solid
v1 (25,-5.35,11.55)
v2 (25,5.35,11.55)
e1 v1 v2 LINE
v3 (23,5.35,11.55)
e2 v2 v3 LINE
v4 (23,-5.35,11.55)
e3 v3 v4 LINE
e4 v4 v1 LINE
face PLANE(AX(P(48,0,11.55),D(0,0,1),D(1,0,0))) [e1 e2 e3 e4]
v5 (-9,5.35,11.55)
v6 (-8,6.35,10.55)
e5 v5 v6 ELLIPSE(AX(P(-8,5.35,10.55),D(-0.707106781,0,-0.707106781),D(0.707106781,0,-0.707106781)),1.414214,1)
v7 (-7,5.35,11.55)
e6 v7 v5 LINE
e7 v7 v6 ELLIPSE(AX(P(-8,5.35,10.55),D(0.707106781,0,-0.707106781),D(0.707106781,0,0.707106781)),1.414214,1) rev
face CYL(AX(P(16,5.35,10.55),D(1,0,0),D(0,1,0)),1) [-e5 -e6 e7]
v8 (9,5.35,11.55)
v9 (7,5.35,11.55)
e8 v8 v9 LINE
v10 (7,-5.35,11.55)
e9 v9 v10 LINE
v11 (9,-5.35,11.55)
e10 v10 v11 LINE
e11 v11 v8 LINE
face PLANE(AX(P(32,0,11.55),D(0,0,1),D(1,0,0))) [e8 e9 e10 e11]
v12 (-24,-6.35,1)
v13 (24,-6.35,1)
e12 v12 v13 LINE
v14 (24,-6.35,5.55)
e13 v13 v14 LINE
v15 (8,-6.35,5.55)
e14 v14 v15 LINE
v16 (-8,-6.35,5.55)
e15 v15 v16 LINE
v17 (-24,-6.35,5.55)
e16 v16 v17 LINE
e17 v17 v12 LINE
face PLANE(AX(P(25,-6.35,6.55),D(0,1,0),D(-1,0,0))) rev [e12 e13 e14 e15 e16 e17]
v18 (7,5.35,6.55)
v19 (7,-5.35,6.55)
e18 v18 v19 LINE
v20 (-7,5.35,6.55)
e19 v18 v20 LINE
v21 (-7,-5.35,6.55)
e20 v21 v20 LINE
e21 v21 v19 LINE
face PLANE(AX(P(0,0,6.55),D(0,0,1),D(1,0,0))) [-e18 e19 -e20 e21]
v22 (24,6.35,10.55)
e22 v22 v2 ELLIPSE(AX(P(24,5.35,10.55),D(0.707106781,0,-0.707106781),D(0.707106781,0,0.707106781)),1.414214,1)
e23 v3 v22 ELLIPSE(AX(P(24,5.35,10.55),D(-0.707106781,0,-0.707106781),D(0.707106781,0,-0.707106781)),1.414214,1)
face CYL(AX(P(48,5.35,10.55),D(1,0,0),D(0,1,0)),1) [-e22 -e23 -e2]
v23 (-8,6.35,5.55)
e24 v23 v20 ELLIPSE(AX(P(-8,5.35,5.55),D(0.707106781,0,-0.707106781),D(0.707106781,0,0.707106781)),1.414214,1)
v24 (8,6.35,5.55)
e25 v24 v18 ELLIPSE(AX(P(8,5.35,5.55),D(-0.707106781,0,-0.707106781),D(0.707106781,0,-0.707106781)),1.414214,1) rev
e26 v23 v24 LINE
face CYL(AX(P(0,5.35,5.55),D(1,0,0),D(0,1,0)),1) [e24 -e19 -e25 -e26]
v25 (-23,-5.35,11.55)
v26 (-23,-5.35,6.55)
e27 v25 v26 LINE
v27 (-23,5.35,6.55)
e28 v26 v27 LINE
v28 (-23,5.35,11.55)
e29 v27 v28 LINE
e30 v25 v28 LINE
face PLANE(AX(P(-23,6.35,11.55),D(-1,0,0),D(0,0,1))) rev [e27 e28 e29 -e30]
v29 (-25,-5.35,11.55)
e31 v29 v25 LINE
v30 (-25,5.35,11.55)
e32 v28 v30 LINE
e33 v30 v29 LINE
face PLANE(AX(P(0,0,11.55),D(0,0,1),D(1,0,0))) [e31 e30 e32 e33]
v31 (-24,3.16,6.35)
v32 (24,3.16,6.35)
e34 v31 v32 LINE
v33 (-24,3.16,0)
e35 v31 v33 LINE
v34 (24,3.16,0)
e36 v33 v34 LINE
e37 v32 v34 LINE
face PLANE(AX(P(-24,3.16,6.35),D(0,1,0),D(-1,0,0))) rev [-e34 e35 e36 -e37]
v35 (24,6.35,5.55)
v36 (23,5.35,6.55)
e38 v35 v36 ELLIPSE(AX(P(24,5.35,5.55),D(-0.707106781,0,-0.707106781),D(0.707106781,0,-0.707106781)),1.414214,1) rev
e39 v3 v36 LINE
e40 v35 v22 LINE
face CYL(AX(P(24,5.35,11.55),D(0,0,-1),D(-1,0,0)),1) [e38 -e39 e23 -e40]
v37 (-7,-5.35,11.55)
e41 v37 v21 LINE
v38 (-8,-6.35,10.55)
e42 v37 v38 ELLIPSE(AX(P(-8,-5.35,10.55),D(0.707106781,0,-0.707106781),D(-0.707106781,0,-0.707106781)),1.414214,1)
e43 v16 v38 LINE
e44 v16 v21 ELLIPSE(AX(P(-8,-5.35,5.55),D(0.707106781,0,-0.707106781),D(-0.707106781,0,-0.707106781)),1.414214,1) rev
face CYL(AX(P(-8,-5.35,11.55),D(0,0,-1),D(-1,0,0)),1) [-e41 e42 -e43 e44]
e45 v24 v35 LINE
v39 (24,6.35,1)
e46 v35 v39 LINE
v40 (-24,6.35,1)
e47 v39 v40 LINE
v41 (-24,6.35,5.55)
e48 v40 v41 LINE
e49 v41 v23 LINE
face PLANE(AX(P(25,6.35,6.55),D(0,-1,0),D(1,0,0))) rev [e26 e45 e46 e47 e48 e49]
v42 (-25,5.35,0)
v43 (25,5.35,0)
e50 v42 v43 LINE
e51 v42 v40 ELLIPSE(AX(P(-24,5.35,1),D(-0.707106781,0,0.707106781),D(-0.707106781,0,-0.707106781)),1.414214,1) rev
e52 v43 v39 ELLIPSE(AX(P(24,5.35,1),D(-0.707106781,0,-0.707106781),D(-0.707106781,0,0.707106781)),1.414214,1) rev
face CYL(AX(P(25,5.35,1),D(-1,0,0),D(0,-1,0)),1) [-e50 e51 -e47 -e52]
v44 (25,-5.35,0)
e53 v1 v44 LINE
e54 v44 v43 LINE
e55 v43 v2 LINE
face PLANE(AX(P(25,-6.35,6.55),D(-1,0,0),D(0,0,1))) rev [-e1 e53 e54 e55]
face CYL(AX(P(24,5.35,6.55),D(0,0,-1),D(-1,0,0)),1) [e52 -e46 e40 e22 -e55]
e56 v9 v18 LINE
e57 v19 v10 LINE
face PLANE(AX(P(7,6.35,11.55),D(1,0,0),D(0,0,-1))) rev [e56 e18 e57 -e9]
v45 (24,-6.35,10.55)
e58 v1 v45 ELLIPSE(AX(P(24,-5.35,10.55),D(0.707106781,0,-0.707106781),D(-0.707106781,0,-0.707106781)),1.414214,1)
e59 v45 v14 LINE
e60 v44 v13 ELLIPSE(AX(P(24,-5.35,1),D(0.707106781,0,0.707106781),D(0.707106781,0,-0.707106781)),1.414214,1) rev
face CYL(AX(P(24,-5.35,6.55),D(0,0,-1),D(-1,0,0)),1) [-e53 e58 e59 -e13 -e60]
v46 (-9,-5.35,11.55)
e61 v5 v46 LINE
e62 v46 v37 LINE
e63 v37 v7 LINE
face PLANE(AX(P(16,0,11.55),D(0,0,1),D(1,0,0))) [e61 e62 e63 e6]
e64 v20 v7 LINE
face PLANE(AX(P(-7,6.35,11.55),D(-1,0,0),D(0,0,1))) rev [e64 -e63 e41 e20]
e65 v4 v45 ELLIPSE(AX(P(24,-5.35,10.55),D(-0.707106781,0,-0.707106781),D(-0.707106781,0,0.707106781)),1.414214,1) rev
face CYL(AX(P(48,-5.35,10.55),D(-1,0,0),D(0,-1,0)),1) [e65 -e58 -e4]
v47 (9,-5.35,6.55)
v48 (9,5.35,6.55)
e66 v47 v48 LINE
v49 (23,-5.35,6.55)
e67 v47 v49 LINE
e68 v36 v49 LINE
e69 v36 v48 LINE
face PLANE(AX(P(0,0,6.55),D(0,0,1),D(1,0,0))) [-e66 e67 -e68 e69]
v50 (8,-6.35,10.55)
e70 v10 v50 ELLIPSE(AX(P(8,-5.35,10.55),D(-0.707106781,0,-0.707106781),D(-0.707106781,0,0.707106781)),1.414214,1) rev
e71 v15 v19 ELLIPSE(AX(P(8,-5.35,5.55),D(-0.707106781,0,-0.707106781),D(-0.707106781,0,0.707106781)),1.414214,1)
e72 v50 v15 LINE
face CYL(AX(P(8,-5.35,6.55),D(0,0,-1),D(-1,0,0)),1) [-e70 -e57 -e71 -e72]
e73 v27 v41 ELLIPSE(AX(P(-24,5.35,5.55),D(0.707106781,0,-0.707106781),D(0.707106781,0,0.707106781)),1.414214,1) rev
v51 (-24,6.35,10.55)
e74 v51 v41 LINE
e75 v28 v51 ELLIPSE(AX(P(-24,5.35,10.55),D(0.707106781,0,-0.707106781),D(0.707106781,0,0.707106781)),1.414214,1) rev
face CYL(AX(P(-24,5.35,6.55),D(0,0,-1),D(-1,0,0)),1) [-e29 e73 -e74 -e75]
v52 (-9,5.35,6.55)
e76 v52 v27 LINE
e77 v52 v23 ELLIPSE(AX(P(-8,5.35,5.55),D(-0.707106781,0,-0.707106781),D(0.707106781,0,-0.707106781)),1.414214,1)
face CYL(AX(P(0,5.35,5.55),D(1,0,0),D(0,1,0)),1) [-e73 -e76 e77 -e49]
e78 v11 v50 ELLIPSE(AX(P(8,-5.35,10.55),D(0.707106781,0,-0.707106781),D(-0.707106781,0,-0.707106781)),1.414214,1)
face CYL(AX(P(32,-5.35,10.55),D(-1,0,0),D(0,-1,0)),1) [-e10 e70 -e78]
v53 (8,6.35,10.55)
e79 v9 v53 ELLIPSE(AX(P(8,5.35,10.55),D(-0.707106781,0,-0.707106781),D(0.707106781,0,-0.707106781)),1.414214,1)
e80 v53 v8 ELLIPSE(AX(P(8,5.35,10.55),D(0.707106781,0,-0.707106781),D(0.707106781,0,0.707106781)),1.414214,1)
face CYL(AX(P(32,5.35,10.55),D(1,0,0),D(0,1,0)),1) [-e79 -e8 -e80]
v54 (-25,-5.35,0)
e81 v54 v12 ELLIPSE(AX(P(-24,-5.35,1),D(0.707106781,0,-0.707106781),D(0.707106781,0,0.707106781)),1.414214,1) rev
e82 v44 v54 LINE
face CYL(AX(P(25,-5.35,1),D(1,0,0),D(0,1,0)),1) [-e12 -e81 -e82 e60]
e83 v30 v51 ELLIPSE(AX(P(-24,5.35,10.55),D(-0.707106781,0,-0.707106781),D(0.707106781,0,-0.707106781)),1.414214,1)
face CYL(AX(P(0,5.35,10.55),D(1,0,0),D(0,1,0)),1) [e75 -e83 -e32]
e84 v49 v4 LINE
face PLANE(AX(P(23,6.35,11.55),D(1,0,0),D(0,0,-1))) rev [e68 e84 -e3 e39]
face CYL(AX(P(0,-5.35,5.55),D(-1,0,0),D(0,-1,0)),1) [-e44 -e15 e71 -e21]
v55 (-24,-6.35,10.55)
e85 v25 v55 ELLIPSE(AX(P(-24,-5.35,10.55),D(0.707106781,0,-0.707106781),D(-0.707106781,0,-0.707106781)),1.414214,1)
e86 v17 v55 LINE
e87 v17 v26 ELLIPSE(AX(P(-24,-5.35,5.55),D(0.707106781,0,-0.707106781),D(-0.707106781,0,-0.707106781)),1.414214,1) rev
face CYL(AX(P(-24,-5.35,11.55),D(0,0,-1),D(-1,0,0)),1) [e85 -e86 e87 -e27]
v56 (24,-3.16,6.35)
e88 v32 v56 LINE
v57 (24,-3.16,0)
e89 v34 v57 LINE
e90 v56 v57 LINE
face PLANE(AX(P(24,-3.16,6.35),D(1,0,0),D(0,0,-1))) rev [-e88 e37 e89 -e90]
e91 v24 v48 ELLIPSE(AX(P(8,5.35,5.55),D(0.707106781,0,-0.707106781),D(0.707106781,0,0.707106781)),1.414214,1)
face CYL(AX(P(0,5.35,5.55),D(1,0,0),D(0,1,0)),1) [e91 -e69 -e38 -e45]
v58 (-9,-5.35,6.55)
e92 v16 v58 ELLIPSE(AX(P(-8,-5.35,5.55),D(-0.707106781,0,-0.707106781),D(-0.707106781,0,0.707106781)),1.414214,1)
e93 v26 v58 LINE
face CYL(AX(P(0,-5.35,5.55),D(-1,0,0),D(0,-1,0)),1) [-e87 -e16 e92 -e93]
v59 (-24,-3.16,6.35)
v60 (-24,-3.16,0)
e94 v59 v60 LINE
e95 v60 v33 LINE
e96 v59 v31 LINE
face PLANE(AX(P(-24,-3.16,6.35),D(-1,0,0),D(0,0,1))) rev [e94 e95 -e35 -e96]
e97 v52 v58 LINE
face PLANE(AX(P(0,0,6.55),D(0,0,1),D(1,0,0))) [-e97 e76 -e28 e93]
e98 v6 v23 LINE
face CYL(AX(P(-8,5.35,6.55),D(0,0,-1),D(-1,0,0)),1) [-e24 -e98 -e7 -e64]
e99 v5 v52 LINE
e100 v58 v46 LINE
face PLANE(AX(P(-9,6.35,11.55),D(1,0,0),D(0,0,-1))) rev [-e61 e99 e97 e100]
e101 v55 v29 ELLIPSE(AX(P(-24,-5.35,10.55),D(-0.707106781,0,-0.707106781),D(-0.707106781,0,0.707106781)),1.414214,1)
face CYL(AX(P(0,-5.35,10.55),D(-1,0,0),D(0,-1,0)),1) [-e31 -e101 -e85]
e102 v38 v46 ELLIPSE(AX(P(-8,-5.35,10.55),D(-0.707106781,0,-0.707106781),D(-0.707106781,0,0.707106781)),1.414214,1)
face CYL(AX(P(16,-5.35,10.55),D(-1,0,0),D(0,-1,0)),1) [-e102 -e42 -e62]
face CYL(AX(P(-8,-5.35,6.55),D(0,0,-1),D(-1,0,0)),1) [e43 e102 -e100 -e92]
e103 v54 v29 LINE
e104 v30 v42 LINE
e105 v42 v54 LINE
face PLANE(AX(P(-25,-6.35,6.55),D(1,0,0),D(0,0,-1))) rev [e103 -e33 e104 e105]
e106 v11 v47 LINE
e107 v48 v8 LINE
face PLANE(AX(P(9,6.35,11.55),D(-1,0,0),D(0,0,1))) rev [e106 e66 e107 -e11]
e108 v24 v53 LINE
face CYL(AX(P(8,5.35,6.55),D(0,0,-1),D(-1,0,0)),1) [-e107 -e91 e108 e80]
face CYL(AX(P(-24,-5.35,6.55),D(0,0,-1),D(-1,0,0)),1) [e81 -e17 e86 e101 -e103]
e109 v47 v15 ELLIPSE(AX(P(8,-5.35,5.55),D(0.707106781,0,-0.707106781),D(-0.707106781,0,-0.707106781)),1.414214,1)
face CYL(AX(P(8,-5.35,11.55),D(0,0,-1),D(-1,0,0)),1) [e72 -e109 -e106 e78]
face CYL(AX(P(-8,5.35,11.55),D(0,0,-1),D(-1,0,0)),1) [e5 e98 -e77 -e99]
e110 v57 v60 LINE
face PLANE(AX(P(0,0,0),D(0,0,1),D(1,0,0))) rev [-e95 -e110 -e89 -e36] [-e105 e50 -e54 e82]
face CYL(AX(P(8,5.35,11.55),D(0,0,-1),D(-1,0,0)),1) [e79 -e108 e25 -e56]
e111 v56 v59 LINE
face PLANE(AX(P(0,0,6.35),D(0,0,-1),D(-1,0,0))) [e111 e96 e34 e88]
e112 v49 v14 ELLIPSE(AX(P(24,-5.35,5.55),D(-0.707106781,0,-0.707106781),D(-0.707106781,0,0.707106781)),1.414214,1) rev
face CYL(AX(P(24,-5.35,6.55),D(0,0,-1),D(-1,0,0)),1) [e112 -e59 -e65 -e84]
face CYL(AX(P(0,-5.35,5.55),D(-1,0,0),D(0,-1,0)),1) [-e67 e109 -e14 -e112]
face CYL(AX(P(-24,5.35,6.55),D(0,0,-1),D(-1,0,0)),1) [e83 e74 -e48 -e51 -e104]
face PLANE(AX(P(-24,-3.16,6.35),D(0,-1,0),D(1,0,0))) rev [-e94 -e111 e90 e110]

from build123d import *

# Parameters (mm, degrees)
SKETCH1_W           = 50
SKETCH1_H           = 12.7
BOSS_EXTRUDE1_DEPTH = 6.55
SKETCH2_W           = 48
SKETCH2_H           = 6.32
CUT_EXTRUDE2_DEPTH  = 6.35
SKETCH3_W           = 2
SKETCH3_H           = 12.7
BOSS_EXTRUDE2_DEPTH = 5
LPATTERN1_COUNT     = 4
LPATTERN1_PITCH     = 16
FILLET1_R           = 1


with BuildPart() as part:
    # Sketch1 → Boss-Extrude1 (new body)
    with BuildSketch(Plane.XY):
        Rectangle(SKETCH1_W, SKETCH1_H)
    extrude(amount=BOSS_EXTRUDE1_DEPTH)

    # Sketch2 → Cut-Extrude2 (cut)
    with BuildSketch(Plane(origin=(0, 0, 0), x_dir=(-1, 0, 0), z_dir=(0, 0, -1))):
        Rectangle(SKETCH2_W, SKETCH2_H)
    extrude(amount=-CUT_EXTRUDE2_DEPTH, mode=Mode.SUBTRACT)

    # Sketch3 → Boss-Extrude2 (add)
    with BuildSketch(Plane.XY.offset(6.55)):
        with Locations((-24, 0)):
            Rectangle(SKETCH3_W, SKETCH3_H)
    boss_extrude2 = extrude(amount=BOSS_EXTRUDE2_DEPTH)

    # LPattern1: Boss-Extrude2 ×4
    with Locations(*[(i * LPATTERN1_PITCH, 0, 0) for i in range(1, LPATTERN1_COUNT)]):
        add(boss_extrude2)

    # Fillet1
    fillet1_edges = [part.edges().sort_by_distance(p)[0] for p in [
        (-16, -6.35, 6.55),
        (-23, -6.35, 9.05),
        (-23, 6.35, 9.05),
        (-24, -6.35, 11.55),
        (-24, 6.35, 11.55),
        (0, -6.35, 6.55),
        (-16, 6.35, 6.55),
        (-9, 6.35, 9.05),
        (-9, -6.35, 9.05),
        (-7, -6.35, 9.05),
        (-7, 6.35, 9.05),
        (-8, -6.35, 11.55),
        (-8, 6.35, 11.55),
        (0, 6.35, 0),
        (0, 6.35, 6.55),
        (16, -6.35, 6.55),
        (7, 6.35, 9.05),
        (7, -6.35, 9.05),
        (9, -6.35, 9.05),
        (9, 6.35, 9.05),
        (8, -6.35, 11.55),
        (8, 6.35, 11.55),
        (0, -6.35, 0),
        (16, 6.35, 6.55),
        (23, 6.35, 9.05),
        (23, -6.35, 9.05),
        (24, -6.35, 11.55),
        (24, 6.35, 11.55),
        (-25, 6.35, 5.775),
        (25, 6.35, 5.775),
        (25, -6.35, 5.775),
        (-25, -6.35, 5.775),
    ]]
    fillet(fillet1_edges, radius=FILLET1_R - 0.0001)  # a hair under: the kernel refuses the full size


solid = part.part
